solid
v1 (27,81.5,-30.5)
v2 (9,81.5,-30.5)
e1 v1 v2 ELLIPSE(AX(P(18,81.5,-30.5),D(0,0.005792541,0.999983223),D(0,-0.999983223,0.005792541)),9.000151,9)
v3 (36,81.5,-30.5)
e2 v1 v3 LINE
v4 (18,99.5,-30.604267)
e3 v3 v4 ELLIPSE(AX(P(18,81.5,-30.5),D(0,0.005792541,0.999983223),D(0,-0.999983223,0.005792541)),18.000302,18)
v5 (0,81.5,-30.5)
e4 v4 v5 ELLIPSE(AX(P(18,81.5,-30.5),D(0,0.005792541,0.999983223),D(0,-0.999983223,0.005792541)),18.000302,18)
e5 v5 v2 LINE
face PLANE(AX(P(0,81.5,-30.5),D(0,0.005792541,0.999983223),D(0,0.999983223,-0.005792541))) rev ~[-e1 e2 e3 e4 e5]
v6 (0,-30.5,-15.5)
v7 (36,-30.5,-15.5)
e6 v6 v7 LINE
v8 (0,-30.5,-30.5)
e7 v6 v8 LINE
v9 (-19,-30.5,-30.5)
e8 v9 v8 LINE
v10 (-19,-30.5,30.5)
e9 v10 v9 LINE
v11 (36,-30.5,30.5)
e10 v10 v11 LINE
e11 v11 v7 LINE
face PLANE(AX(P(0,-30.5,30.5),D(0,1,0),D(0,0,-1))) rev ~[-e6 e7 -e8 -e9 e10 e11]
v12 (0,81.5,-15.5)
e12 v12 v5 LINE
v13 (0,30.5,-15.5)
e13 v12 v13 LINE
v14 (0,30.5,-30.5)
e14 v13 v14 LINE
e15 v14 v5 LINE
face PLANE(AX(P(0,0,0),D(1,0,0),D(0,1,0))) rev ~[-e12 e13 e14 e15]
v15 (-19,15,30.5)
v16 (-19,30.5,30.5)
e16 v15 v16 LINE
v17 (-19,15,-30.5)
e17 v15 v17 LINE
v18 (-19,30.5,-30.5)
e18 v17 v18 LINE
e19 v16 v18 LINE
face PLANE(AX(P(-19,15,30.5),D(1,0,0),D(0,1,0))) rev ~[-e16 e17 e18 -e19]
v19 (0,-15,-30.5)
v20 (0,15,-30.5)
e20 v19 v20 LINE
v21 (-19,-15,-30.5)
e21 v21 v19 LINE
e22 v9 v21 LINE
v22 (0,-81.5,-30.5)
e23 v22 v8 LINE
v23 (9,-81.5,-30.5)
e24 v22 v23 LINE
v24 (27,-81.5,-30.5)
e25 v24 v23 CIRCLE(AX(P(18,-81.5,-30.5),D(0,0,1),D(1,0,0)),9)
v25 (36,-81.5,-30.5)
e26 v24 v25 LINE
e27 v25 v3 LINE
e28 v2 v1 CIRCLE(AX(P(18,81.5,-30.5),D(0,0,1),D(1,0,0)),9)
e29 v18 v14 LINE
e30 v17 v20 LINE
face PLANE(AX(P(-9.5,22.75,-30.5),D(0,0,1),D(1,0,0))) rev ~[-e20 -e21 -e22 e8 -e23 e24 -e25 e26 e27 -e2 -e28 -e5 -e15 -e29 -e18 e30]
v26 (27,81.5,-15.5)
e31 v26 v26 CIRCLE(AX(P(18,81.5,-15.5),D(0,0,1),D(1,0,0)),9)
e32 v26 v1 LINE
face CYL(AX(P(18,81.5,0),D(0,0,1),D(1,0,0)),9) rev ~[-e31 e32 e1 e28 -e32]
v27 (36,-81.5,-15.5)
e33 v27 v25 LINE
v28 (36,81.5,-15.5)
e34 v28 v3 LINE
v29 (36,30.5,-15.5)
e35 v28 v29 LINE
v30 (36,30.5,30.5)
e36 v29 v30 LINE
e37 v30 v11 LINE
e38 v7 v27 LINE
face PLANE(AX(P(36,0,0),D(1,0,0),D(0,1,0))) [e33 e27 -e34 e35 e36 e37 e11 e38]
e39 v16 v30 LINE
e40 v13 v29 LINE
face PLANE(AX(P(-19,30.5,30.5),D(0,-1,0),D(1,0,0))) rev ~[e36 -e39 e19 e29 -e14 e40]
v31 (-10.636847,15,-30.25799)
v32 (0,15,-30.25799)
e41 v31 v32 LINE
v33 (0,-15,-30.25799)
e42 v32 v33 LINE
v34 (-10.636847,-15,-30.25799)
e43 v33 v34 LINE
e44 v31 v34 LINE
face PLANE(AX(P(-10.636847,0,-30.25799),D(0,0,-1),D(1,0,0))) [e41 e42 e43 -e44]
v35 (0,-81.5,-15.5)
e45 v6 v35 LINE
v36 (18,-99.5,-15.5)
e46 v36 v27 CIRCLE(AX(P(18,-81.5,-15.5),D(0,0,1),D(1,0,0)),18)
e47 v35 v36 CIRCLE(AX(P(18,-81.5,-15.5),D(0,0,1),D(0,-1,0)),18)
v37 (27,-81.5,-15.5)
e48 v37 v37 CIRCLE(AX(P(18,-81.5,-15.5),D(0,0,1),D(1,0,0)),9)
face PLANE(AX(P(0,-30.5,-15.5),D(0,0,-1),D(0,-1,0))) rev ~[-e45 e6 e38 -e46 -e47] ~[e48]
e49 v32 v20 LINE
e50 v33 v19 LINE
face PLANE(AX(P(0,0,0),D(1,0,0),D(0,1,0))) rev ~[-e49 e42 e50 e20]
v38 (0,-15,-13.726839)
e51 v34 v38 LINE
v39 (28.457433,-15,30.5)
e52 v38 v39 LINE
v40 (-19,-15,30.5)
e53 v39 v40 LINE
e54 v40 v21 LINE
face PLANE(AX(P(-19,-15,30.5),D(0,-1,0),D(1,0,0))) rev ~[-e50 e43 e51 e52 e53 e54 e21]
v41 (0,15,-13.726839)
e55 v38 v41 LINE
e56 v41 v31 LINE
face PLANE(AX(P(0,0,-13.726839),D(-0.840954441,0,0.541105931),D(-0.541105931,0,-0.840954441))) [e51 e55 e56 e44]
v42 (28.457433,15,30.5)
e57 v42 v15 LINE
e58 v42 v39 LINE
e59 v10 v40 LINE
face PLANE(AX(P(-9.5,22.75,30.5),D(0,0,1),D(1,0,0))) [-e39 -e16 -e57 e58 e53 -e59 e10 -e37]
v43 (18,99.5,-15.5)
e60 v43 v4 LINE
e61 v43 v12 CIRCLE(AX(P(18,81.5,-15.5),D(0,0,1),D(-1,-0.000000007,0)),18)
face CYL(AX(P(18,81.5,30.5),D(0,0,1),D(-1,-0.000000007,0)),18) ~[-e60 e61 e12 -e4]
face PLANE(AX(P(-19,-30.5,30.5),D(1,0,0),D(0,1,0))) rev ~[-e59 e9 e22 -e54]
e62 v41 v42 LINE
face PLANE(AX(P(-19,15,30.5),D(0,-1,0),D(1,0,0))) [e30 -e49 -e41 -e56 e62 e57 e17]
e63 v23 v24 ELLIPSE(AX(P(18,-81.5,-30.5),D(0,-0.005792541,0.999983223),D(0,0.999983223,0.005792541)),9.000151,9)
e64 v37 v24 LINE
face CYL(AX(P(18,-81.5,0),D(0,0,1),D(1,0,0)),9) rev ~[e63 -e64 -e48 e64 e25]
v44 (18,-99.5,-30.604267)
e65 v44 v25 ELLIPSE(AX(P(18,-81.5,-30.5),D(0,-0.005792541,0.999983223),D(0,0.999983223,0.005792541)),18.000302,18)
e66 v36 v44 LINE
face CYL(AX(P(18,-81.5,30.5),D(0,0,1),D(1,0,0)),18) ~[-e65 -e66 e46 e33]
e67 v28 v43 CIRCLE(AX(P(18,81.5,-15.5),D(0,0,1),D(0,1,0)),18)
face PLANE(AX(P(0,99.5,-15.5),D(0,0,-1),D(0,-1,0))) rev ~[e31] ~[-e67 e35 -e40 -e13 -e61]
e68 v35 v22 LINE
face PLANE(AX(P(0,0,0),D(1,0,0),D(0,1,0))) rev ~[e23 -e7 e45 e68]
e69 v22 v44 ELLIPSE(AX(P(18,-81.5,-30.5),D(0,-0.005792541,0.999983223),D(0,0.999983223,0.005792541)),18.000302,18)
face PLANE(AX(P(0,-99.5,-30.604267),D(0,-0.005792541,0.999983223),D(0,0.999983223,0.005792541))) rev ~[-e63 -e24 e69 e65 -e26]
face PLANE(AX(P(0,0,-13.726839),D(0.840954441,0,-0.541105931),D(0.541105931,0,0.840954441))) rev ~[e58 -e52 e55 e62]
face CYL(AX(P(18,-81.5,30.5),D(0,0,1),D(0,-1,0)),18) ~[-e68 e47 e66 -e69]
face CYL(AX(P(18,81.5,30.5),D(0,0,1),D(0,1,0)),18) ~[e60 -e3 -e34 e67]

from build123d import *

# Parameters (mm, degrees)
F0_W      = 51
F0_H      = 15
F1_DEPTH  = 36
F3_R      = 9
F4_DEPTH  = 103.1
F6_DEPTH  = 15
F7_DEPTH  = 15
F2_W      = 19
F2_H      = 15.5
F8_DEPTH  = 61
F9_DEPTH  = 100
F10_DEPTH = 100
F11_DEPTH = 25
F12_DEPTH = 25


with BuildPart() as f1:
    # F0 (on Right) → F1 (new body)
    with BuildSketch(Plane.YZ):
        Polygon((30.5, 30.5), (-30.5, 30.5), (-30.5, -15.5), (-30.5, -30.5), (30.5, -30.5), (30.5, -15.5), align=None)
        with Locations((-56, -23)):
            Rectangle(F0_W, F0_H)
        with Locations((56, -23)):
            Rectangle(F0_W, F0_H)
        Polygon((-81.5, -30.5), (-81.5, -15.5), (-99.5, -15.5), (-99.5, -30.6042674929), align=None)
        Polygon((99.5, -15.5), (81.5, -15.5), (81.5, -30.5), (99.5, -30.6042674929), align=None)
    extrude(amount=F1_DEPTH)

    # F3 (on Top) → F4 (cut)
    with BuildSketch(Plane.XY):
        with Locations((18, 81.5)):
            Circle(F3_R)
        with Locations((18, -81.5)):
            Circle(F3_R)
    extrude(amount=-F4_DEPTH, mode=Mode.SUBTRACT)

    # F5 (on Front) → F6 (cut)
    with BuildSketch(Plane.XZ):
        Polygon((0, -13.7268389231), (28.6131525338, 30.7420096008), (-18.6368474662, 30.7420096008), (-18.6368474662, -30.2579903992), (-10.6368474662, -30.2579903992), align=None)
    extrude(amount=F6_DEPTH, mode=Mode.SUBTRACT)

    # F5 (on Front) → F7 (cut)
    with BuildSketch(Plane.XZ):
        Polygon((0, -13.7268389231), (28.6131525338, 30.7420096008), (-18.6368474662, 30.7420096008), (-18.6368474662, -30.2579903992), (-10.6368474662, -30.2579903992), align=None)
    extrude(amount=-F7_DEPTH, mode=Mode.SUBTRACT)

    # F2 (on face) → F8 (join)
    with BuildSketch(Plane.XY.offset(30.5)):
        with Locations((-9.5, 22.75)):
            Rectangle(F2_W, F2_H)
        with Locations((-9.5, -22.75)):
            Rectangle(F2_W, F2_H)
    extrude(amount=-F8_DEPTH)

    # F2 (on face) → F9 (cut)
    with BuildSketch(Plane.XY.offset(30.5)):
        with BuildLine():
            Line((36, -99.5), (36, -81.5))
            ThreePointArc((36, -81.5), (30.7279220614, -94.2279220614), (18, -99.5))
            Line((18, -99.5), (36, -99.5))
        make_face()
        with BuildLine():
            ThreePointArc((18, 99.5), (30.7279220614, 94.2279220614), (36, 81.5))
            Line((36, 81.5), (36, 99.5))
            Line((36, 99.5), (18, 99.5))
        make_face()
        with BuildLine():
            Line((0, 99.5), (0, 81.4999998705))
            ThreePointArc((0, 81.4999998705), (5.2720778928, 94.2279220156), (18, 99.5))
            Line((18, 99.5), (0, 99.5))
        make_face()
    extrude(amount=-F9_DEPTH, mode=Mode.SUBTRACT)

    # F2 (on face) → F10 (cut)
    with BuildSketch(Plane.XY.offset(30.5)):
        with BuildLine():
            ThreePointArc((18, -99.5), (5.2720779386, -94.2279220614), (0, -81.5))
            Line((0, -81.5), (0, -99.5))
            Line((0, -99.5), (18, -99.5))
        make_face()
        with BuildLine():
            Line((36, -99.5), (36, -81.5))
            ThreePointArc((36, -81.5), (30.7279220614, -94.2279220614), (18, -99.5))
            Line((18, -99.5), (36, -99.5))
        make_face()
    extrude(amount=-F10_DEPTH, mode=Mode.SUBTRACT)

    # F5 (on Front) → F11 (join)
    with BuildSketch(Plane.XZ):
        Polygon((0, -30.2579903992), (0, -13.7268389231), (-10.6368474662, -30.2579903992), align=None)
    extrude(amount=F11_DEPTH)

    # F5 (on Front) → F12 (join)
    with BuildSketch(Plane.XZ):
        Polygon((0, -30.2579903992), (0, -13.7268389231), (-10.6368474662, -30.2579903992), align=None)
    extrude(amount=-F12_DEPTH)


solid = f1.part
